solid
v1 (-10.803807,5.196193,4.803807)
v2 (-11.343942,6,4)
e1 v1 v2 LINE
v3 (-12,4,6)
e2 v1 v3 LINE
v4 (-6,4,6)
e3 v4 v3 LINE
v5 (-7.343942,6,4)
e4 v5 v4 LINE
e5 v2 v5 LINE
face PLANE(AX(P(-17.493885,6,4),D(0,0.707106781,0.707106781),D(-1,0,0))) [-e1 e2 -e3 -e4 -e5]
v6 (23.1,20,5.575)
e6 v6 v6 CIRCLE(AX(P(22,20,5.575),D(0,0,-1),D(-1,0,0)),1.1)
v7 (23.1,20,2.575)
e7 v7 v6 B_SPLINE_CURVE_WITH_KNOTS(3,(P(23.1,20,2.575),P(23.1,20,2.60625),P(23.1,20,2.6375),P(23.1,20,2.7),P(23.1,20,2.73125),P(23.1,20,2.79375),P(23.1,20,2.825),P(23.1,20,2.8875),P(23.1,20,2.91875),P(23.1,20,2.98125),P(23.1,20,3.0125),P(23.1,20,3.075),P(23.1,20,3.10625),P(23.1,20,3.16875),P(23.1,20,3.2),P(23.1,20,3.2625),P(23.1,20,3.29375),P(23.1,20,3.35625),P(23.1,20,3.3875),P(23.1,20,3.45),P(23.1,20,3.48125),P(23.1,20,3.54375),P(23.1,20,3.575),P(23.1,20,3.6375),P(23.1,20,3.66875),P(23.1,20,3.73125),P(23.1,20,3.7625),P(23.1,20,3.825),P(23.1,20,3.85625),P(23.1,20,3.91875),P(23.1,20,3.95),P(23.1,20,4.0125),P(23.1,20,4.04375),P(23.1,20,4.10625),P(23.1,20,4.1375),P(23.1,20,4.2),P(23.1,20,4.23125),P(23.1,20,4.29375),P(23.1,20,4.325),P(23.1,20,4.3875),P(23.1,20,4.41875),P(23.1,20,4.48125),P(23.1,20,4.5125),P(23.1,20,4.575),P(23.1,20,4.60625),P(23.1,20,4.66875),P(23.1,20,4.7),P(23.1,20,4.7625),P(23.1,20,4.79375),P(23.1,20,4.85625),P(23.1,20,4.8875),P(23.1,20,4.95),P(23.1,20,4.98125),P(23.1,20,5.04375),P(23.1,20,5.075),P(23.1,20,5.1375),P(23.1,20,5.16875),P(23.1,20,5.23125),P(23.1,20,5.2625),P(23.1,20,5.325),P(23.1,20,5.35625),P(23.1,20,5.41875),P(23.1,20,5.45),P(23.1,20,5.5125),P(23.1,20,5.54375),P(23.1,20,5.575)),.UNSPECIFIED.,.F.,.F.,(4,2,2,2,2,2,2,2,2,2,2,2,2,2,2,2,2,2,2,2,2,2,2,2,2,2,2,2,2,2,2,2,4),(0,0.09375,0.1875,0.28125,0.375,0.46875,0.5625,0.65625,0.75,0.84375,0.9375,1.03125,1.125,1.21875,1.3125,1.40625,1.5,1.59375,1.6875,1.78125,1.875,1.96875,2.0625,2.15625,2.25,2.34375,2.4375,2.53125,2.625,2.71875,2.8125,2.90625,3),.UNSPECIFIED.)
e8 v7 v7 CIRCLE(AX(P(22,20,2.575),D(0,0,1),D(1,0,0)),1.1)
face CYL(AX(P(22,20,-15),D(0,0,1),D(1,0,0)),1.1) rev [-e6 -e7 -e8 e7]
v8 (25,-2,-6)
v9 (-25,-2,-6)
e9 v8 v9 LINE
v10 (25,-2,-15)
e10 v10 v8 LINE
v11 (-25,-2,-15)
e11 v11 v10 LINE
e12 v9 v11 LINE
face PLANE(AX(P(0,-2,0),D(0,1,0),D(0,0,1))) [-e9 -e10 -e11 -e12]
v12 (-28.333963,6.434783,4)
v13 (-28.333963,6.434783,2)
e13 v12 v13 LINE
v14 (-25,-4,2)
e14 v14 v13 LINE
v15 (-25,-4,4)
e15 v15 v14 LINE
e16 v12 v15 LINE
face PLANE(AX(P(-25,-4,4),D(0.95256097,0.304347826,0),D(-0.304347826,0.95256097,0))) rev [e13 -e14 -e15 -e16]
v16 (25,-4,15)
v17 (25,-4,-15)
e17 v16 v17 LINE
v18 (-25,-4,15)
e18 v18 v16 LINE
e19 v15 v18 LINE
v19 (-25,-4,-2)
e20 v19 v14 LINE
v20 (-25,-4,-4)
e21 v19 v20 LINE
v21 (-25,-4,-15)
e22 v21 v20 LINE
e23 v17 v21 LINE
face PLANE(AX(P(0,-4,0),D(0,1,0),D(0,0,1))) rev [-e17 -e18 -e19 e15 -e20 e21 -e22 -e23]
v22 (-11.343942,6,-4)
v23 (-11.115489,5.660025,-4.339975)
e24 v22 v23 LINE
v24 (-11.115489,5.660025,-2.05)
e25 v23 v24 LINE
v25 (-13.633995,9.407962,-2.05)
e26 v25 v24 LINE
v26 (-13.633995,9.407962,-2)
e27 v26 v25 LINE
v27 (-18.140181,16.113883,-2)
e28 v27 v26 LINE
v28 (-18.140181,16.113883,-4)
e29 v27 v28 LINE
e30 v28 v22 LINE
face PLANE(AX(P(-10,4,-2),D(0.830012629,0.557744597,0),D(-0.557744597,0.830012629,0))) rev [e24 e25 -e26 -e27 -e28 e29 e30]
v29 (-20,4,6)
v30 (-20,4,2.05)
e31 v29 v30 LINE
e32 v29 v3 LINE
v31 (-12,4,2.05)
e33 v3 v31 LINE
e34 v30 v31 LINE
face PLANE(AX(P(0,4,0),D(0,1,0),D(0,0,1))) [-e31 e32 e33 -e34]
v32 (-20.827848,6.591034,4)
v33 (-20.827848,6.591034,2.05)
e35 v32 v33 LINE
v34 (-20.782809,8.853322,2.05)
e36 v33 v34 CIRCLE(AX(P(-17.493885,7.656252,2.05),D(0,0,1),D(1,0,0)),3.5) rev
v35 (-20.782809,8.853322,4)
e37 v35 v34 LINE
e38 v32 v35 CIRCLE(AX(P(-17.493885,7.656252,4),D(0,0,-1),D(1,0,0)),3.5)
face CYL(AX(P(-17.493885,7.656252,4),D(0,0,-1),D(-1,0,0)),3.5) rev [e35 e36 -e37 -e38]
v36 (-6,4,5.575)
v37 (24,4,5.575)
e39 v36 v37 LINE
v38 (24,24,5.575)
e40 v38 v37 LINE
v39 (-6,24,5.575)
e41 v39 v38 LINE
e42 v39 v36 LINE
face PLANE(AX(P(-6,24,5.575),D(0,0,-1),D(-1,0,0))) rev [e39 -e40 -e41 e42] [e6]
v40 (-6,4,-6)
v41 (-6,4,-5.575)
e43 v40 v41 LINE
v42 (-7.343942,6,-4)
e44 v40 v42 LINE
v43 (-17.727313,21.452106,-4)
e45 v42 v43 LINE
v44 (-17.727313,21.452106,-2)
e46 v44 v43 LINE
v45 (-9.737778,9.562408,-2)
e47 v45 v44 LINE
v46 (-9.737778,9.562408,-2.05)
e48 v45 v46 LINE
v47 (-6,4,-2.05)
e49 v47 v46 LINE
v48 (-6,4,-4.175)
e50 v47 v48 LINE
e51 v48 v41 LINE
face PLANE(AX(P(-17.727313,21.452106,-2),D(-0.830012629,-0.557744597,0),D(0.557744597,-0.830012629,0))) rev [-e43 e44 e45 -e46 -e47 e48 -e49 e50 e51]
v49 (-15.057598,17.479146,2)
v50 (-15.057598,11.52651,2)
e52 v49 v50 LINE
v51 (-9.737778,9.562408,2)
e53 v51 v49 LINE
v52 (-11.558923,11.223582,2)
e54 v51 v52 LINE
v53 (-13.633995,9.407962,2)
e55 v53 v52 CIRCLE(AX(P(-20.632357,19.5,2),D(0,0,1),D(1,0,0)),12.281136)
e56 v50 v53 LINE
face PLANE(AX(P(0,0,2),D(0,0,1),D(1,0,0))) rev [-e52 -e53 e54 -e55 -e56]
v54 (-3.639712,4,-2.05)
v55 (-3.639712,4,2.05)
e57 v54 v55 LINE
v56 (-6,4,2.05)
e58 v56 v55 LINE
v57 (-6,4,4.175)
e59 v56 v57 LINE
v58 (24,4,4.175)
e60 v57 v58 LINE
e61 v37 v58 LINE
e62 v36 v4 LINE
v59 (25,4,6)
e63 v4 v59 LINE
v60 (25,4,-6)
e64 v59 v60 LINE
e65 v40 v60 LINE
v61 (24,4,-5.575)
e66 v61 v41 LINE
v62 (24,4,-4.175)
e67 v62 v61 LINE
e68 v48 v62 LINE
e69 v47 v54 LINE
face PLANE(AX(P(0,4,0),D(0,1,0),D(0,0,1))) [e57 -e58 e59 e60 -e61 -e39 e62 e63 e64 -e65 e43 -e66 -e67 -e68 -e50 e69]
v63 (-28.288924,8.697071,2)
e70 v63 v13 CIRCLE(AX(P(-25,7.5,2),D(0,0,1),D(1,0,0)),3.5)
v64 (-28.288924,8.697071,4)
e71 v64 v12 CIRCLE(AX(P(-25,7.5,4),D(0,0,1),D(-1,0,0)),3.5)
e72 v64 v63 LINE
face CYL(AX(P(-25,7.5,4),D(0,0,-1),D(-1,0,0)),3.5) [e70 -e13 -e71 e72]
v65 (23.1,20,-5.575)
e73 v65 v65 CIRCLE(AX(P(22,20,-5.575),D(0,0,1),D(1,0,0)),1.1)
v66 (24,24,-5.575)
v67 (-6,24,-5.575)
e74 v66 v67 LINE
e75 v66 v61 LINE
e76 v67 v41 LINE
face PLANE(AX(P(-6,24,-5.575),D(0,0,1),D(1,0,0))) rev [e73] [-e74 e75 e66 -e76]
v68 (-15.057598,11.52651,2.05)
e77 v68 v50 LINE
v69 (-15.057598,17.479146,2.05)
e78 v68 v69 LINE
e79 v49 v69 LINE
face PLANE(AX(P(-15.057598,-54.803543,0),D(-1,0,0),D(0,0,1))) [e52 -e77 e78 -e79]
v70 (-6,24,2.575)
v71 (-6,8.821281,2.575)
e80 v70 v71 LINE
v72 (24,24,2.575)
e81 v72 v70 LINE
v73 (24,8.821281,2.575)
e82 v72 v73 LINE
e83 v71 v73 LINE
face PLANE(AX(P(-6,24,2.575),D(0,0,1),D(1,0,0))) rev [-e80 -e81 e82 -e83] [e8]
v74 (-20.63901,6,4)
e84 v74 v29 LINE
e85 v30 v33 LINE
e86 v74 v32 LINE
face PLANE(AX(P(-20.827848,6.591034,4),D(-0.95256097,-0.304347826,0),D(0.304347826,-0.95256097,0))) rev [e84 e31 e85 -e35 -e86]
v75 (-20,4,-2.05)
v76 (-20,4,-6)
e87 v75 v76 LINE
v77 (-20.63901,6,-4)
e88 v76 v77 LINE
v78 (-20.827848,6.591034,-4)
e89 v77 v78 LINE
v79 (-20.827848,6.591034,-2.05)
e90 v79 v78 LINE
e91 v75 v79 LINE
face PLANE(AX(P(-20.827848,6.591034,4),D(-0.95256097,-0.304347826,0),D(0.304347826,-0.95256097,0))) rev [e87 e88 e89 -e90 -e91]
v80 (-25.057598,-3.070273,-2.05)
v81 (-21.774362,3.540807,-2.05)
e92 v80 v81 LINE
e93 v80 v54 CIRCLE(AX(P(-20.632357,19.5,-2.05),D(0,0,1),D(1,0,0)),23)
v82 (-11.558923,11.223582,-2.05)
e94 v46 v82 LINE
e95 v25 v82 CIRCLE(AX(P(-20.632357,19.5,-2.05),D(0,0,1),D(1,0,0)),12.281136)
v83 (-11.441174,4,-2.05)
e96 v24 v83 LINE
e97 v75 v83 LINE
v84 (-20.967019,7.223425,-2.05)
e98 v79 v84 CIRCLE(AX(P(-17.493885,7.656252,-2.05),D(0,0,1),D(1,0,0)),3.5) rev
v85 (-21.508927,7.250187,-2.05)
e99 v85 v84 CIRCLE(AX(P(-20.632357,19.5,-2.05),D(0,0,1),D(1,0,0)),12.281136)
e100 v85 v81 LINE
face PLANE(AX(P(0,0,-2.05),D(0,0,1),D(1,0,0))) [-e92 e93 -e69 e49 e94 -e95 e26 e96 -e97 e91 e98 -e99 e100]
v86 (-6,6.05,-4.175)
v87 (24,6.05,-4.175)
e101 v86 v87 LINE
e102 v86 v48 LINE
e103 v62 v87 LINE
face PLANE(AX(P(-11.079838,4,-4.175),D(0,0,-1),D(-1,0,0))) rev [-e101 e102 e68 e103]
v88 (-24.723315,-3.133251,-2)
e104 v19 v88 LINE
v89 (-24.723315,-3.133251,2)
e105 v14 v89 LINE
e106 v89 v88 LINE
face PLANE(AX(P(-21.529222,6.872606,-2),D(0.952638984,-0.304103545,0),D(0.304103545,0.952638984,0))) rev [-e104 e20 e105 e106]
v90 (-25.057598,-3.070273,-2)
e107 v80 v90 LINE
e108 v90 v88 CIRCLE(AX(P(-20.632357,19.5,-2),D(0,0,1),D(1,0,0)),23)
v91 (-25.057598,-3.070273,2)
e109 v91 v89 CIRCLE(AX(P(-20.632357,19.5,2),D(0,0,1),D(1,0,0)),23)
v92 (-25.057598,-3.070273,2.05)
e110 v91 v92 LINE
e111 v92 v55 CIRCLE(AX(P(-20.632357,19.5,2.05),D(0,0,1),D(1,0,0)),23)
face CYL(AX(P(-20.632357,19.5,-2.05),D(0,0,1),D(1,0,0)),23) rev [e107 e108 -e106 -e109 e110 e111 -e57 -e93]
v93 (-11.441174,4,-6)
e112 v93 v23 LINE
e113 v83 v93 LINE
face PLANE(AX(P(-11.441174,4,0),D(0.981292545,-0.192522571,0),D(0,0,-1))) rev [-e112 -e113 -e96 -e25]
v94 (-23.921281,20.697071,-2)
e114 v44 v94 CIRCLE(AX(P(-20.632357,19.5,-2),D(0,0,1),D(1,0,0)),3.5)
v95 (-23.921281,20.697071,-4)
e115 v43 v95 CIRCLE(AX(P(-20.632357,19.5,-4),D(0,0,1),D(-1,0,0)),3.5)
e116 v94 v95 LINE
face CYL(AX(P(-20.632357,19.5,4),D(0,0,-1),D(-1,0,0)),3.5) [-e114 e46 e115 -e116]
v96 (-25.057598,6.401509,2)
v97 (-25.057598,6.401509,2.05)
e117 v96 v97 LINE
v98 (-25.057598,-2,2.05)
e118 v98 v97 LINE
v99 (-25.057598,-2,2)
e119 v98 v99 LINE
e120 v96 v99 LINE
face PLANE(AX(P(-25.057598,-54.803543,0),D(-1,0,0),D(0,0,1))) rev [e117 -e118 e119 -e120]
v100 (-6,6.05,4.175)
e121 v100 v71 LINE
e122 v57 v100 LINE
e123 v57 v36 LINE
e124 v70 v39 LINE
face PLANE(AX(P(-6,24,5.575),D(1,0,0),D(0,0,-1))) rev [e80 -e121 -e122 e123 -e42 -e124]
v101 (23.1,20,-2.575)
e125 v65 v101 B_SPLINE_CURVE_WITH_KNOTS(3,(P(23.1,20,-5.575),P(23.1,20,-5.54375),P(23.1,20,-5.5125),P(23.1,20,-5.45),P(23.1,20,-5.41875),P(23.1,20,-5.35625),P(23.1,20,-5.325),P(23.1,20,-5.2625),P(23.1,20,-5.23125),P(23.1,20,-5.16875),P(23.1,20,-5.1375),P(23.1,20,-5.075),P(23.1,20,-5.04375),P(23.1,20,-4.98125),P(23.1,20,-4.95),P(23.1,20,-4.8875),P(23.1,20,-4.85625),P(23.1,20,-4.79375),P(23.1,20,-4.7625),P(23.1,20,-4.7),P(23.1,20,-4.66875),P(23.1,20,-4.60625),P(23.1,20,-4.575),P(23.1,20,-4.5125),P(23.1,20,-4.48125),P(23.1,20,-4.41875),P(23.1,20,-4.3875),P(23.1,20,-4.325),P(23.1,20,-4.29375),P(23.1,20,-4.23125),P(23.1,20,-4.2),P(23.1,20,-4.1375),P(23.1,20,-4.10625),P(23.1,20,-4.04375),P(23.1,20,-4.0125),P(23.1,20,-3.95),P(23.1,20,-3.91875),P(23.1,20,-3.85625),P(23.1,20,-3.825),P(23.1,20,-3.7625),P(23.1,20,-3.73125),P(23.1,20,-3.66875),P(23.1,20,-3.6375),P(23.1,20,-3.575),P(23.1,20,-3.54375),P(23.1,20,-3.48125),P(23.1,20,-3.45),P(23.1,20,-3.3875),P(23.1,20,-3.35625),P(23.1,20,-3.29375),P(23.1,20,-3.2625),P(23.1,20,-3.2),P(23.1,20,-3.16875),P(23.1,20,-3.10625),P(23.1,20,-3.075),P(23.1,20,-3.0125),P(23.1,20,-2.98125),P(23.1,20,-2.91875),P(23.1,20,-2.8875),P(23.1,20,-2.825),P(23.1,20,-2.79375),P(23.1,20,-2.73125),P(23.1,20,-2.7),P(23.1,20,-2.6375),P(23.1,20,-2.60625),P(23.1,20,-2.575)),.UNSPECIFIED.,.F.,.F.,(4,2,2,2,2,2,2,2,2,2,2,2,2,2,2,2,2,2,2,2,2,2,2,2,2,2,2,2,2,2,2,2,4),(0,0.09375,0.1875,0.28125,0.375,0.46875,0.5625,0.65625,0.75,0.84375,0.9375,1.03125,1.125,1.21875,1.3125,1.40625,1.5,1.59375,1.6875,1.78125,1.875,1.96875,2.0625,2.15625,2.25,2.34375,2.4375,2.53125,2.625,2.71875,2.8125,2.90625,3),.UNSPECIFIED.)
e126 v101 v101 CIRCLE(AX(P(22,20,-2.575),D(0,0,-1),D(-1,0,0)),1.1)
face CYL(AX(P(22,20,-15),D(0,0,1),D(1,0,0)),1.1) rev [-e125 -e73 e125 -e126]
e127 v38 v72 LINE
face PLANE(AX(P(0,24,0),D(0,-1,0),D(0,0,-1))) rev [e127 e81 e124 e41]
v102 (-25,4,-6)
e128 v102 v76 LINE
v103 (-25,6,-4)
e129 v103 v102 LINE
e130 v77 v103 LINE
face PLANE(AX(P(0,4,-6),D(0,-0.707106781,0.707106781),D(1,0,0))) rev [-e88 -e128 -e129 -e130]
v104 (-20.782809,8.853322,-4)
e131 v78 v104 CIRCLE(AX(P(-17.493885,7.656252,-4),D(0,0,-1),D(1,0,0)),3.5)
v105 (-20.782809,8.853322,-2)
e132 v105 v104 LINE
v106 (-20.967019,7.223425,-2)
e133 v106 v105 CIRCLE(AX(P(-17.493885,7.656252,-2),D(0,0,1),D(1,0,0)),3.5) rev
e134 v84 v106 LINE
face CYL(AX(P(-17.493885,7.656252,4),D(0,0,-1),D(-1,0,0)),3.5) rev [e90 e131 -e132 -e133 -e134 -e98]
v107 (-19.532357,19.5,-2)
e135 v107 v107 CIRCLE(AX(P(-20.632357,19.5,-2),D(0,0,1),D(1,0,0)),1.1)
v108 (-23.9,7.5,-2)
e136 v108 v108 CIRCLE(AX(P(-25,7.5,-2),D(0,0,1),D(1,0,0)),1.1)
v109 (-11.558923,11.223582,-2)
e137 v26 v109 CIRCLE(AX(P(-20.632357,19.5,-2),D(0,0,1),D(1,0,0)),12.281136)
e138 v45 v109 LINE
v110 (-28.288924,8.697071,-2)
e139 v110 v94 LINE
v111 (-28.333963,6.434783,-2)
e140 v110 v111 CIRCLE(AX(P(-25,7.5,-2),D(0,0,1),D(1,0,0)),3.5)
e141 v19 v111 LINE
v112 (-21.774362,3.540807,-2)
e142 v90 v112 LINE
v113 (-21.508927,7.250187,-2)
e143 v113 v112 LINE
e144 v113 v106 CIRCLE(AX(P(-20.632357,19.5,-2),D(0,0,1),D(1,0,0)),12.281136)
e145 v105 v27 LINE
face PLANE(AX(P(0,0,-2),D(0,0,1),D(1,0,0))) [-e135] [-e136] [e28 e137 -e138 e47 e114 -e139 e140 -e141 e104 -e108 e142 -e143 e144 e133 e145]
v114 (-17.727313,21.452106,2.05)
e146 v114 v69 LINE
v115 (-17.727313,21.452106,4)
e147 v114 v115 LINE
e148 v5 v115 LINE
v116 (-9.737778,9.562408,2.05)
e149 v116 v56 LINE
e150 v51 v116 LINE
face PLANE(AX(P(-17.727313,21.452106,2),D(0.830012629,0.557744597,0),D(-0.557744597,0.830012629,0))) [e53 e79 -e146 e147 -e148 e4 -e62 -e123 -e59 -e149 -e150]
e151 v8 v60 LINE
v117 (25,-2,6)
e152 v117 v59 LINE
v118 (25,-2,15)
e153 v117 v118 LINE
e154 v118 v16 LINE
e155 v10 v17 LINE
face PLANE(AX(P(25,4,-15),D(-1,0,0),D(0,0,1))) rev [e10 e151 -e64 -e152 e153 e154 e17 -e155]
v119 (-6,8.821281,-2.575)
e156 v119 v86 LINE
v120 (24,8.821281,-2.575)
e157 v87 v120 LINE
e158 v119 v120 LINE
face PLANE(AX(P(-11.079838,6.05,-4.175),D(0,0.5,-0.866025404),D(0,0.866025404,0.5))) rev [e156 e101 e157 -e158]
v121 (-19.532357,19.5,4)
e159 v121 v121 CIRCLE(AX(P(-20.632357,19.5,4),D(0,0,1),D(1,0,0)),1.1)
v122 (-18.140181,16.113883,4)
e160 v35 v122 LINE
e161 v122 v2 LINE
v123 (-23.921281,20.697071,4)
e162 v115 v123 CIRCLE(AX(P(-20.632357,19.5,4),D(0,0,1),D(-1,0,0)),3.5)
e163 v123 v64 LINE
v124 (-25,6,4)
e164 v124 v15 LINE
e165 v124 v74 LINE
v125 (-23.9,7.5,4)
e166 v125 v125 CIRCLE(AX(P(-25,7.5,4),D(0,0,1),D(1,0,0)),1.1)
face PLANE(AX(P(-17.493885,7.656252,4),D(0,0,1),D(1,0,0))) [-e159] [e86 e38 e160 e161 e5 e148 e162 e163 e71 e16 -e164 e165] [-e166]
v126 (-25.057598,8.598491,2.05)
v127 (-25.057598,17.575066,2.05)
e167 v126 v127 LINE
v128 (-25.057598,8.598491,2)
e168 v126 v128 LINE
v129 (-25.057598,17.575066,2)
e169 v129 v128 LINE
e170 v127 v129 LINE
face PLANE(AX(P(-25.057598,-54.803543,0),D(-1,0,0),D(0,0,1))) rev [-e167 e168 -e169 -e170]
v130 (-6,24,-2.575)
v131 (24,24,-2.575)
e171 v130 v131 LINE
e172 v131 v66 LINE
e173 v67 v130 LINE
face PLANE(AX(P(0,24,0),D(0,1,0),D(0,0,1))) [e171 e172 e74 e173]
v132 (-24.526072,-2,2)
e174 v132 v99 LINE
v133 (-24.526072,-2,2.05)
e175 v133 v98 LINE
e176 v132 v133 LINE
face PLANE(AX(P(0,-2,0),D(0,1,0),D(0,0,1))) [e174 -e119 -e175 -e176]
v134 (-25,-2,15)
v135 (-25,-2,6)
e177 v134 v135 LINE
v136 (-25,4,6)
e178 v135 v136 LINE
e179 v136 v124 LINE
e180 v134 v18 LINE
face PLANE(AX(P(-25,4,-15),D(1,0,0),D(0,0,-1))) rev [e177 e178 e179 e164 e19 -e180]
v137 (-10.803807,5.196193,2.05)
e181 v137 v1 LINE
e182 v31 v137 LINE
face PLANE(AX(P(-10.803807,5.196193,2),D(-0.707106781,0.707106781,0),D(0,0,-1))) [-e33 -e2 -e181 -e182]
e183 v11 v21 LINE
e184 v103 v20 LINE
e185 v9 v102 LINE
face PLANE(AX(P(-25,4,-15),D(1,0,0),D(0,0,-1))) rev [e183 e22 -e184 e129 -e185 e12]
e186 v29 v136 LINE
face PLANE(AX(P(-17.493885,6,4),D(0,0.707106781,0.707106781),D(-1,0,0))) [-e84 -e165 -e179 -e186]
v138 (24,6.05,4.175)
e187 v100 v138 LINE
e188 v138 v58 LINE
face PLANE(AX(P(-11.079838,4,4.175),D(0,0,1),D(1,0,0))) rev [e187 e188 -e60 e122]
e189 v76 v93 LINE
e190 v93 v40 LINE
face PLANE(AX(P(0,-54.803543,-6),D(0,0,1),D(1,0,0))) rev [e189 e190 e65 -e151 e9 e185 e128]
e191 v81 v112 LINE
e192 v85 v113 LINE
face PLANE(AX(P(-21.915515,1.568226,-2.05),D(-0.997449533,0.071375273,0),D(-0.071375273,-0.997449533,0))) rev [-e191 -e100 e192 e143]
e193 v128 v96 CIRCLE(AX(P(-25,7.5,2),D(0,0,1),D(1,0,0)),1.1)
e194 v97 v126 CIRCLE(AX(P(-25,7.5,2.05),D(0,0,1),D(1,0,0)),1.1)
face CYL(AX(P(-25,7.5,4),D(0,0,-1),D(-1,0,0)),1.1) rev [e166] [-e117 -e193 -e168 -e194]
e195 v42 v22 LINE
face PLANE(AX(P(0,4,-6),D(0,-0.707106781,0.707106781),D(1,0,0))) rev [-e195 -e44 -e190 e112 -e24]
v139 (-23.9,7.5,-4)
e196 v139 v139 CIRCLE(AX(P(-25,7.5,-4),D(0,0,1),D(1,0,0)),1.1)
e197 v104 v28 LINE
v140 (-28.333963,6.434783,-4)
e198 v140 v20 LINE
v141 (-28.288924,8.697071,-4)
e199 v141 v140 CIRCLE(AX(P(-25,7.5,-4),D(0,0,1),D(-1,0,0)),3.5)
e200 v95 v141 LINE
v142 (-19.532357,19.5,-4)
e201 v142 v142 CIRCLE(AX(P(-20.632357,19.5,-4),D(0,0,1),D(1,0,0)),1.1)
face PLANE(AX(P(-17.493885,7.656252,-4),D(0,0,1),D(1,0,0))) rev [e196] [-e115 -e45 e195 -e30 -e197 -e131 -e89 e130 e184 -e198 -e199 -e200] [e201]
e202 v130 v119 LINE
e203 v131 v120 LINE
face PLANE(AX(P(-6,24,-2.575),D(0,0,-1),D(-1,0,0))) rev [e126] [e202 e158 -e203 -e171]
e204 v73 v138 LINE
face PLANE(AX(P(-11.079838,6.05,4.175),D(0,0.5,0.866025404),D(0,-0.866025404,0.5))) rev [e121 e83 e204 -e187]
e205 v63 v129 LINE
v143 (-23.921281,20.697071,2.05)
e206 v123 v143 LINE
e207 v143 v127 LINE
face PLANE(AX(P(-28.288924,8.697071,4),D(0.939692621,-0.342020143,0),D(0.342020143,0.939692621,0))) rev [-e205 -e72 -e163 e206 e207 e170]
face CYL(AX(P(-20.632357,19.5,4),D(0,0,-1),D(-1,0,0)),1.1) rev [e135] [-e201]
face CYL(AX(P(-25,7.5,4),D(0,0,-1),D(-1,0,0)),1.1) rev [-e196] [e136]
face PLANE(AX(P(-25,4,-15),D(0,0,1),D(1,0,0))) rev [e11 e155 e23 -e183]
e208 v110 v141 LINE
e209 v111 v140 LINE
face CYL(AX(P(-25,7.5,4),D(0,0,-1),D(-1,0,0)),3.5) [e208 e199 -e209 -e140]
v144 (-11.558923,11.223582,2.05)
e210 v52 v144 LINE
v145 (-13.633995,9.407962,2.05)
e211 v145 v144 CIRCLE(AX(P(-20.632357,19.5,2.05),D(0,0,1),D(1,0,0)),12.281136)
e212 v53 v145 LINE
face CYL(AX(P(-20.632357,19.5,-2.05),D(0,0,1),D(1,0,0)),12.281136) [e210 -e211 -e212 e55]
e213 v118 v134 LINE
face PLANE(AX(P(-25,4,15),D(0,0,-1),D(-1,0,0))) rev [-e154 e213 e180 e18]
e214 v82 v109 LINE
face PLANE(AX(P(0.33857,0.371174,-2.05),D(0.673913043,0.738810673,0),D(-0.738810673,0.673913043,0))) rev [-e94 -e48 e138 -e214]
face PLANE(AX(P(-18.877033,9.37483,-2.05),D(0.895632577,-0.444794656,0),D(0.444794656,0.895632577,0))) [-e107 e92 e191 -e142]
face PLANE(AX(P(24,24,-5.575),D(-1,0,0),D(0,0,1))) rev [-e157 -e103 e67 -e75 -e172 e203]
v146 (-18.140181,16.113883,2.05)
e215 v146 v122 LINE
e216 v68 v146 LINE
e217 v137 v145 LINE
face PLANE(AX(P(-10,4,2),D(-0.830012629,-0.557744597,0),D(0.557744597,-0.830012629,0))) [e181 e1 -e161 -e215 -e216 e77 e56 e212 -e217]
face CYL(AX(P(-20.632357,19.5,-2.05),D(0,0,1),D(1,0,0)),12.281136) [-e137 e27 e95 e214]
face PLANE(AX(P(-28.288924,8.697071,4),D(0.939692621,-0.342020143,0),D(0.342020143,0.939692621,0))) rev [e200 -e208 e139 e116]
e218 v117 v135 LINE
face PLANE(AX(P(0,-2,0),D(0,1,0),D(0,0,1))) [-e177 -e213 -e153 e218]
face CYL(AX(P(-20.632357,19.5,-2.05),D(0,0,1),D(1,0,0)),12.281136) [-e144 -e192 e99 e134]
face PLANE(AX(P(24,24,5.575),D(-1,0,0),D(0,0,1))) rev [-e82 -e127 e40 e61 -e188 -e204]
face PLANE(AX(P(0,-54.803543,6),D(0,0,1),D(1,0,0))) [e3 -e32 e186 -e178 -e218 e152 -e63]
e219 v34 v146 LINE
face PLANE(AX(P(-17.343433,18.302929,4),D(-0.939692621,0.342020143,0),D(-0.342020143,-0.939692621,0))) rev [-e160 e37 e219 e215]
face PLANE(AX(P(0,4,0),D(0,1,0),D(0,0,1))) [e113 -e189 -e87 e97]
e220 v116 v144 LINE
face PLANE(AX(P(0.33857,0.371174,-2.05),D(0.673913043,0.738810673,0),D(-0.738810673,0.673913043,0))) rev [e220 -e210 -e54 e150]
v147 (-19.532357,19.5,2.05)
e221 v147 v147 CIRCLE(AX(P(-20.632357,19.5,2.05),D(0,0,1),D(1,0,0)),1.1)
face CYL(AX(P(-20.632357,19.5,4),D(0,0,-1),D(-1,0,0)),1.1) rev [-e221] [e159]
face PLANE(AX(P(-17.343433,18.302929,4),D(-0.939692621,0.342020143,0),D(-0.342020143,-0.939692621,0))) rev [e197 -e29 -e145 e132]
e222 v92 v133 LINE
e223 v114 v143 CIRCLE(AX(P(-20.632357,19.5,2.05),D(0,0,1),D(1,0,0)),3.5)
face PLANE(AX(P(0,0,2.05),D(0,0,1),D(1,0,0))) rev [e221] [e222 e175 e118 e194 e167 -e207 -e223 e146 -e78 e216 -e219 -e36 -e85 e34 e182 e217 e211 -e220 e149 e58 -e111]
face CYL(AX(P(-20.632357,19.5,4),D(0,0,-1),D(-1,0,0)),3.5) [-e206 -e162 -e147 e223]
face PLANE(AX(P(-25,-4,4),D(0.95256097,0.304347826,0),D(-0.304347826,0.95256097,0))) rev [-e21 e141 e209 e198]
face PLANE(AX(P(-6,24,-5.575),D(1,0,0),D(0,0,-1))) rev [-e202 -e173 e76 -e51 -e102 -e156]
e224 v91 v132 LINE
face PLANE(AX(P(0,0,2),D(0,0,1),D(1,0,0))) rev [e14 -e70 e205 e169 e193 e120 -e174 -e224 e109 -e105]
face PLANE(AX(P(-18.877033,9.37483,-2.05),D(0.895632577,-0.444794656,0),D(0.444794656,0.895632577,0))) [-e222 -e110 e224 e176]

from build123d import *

# Parameters (mm, degrees)
SKETCH_1_W               = 50
SKETCH_1_H               = 30
EXTRUDE_1_DEPTH          = 4
SKETCH_2_R               = 1.1
EXTRUDE_2_DEPTH          = 4
CUT_EXTRUDE_1_DEPTH      = 2
EXTRUDE_3_DEPTH          = 2
CUT_EXTRUDE_3_DEPTH      = 2.05
SKETCH_7_W               = 30
SKETCH_7_H               = 3
EXTRUDE_4_DEPTH          = 20
FILLET_3_R               = 2
CUT_EXTRUDE_5_DEPTH      = 38.911080175
CUT_EXTRUDE_5_DEPTH_BACK = 6
SKETCH_9_W               = 10
SKETCH_9_H               = 2
CUT_EXTRUDE_6_DEPTH      = 30
CUT_EXTRUDE_7_DEPTH      = 41.165283517
CUT_EXTRUDE_7_DEPTH_BACK = 41.165283517
SKETCH_11_R              = 1.1


with BuildPart() as part:
    # 草图1 → 凸台-拉伸1 (new, symmetric)
    with BuildSketch(Plane(origin=(0, 0, 0), x_dir=(1, 0, 0), z_dir=(0, 1, 0))):
        Rectangle(SKETCH_1_W, SKETCH_1_H)
    extrude(amount=EXTRUDE_1_DEPTH, both=True)

    # 草图2 → 凸台-拉伸2 (add, symmetric)
    with BuildSketch(Plane.XY):
        with BuildLine():
            Line((-25, -4), (-28.333963394, 6.434782609))
            ThreePointArc((-28.333963394, 6.434782609), (-28.499306582, 7.56966666), (-28.288924173, 8.697070502))
            Line((-28.288924173, 8.697070502), (-23.921281362, 20.697070502))
            ThreePointArc((-23.921281362, 20.697070502), (-19.435286687, 22.788924173), (-17.343433016, 18.302929498))
            Line((-17.343433016, 18.302929498), (-20.782808769, 8.853322281))
            ThreePointArc((-20.782808769, 8.853322281), (-20.993191178, 7.72591844), (-20.827847989, 6.591034388))
            Line((-20.827847989, 6.591034388), (-20, 4))
            Line((-20, 4), (-25, -4))
        make_face()
        with Locations((-25, 7.5)):
            Circle(SKETCH_2_R, mode=Mode.SUBTRACT)
        with Locations((-20.632357189, 19.5)):
            Circle(SKETCH_2_R, mode=Mode.SUBTRACT)
    extrude(amount=EXTRUDE_2_DEPTH, both=True)

    # 草图3 → 切除-拉伸1 (cut, symmetric)
    with BuildSketch(Plane.XY):
        with BuildLine():
            ThreePointArc((-28.288924173, 8.697070502), (-28.499306582, 7.56966666), (-28.333963394, 6.434782609))
            Line((-28.333963394, 6.434782609), (-25, -4))
            Line((-25, -4), (-21.711075827, 6.302929498))
            Line((-21.711075827, 6.302929498), (-20.537616571, 5.928335213))
            Line((-20.537616571, 5.928335213), (-20.782808769, 8.853322281))
            Line((-20.782808769, 8.853322281), (-17.343433016, 18.302929498))
            ThreePointArc((-17.343433016, 18.302929498), (-19.435286687, 22.788924173), (-23.921281362, 20.697070502))
            Line((-23.921281362, 20.697070502), (-28.288924173, 8.697070502))
        make_face()
    extrude(amount=CUT_EXTRUDE_1_DEPTH, both=True, mode=Mode.SUBTRACT)

    # 草图4 → 凸台-拉伸3 (add)
    with BuildSketch(Plane.XY.offset(4)):
        Polygon((-17.727312988, 21.45210609), (-6, 4), (-10, 4), (-18.140180759, 16.113883065), align=None)
    extrude_3 = extrude(amount=-EXTRUDE_3_DEPTH)

    # 镜向1: 凸台-拉伸3 across plane
    add(extrude_3.mirror(Plane.XY))

    # 草图6 → 切除-拉伸3 (cut, symmetric)
    with BuildSketch(Plane.XY):
        with BuildLine():
            Line((-21.508926635, 7.250186543), (-22.273988478, -3.441339253))
            ThreePointArc((-22.273988478, -3.441339253), (-12.102598016, -1.859850385), (-3.639711721, 4))
            Line((-3.639711721, 4), (-11.558922773, 11.223582198))
            ThreePointArc((-11.558922773, 11.223582198), (-16.077786178, 8.094642196), (-21.508926635, 7.250186543))
        make_face()
        with BuildLine():
            Line((-22.273988478, -3.441339253), (-21.774361564, 3.540807476))
            Line((-21.774361564, 3.540807476), (-25.057597959, -3.070273462))
            ThreePointArc((-25.057597959, -3.070273462), (-23.671461761, -3.298329838), (-22.273988478, -3.441339253))
        make_face()
    extrude(amount=CUT_EXTRUDE_3_DEPTH, both=True, mode=Mode.SUBTRACT)

    # 草图7 → 凸台-拉伸4 (add)
    with BuildSketch(Plane(origin=(0, 4, 0), x_dir=(1, 0, 0), z_dir=(0, 1, 0))):
        with Locations((9, -4.075)):
            Rectangle(SKETCH_7_W, SKETCH_7_H)
        with Locations((9, 4.075)):
            Rectangle(SKETCH_7_W, SKETCH_7_H)
    extrude(amount=EXTRUDE_4_DEPTH)

    # 圆角3
    # the kernel refuses this fillet: 2 mm, written as the material it takes off along each edge
    with BuildSketch(Plane(origin=(-21.579710991, 6.260994922, 2), x_dir=(-0.07137527342969462, -0.9974495327297699, 0), z_dir=(0, 0, -1))) as fillet_3_piece_1:
        with BuildLine():
            CenterArc((0.687360644, 2), FILLET_3_R, 248.905574678, 21.094425322)
            Line((-0.032451423, 0.134022886), (-0.046847664, 0.096703344))
            ThreePointArc((-0.046847664, 0.096703344), (-0.055102303, 0.05759812), (-0.038876591, -0.009413323))
            Line((-0.038876591, -0.009413323), (0, -0.04))
            Line((0, -0.04), (0.687360644, -0.04))
            Line((0.687360644, -0.04), (0.687360644, 0))
        make_face()
    extrude(amount=4, mode=Mode.SUBTRACT)

    # 倒角2
    # the kernel refuses this chamfer: 2, 1.441174265 mm, written as the material it adds along each edge
    with BuildSketch(Plane(origin=(-6, 4, -4), x_dir=(0, -0.02749587661058627, -0.9996219169112968), z_dir=(-1, 0, 0))) as chamfer_2_piece_1_section:
        with BuildLine():
            Line((2.05734639, 0), (-0.11309431, -2.054235587))
            Line((-0.11309431, -2.054235587), (-0.153079186, -2.053135752))
            ThreePointArc((-0.153079186, -2.053135752), (-0.068258454, -1.026795659), (-0.039984877, 0.001099835))
            Line((-0.039984877, 0.001099835), (0.001099835, 0.039984877))
            ThreePointArc((0.001099835, 0.039984877), (1.028995329, 0.011711299), (2.058446225, 0.039984877))
            Line((2.058446225, 0.039984877), (2.05734639, 0))
        make_face()
    chamfer_2_piece_1 = extrude(amount=9.143365976, mode=Mode.PRIVATE)
    chamfer_2_piece_1 = split(chamfer_2_piece_1, bisect_by=Plane(origin=(-7.065617909, 5.585808856, -4.659423843), z_dir=(-0.8300126289410857, -0.5577445972829389, 0)), keep=Keep.TOP, mode=Mode.PRIVATE)
    chamfer_2_piece_1 = split(chamfer_2_piece_1, bisect_by=Plane(origin=(-9.821301765, 3.734068618, -4.659423843), z_dir=(0.8300126289410859, 0.5577445972829388, 0)), keep=Keep.TOP, mode=Mode.PRIVATE)
    add(chamfer_2_piece_1)
    with BuildSketch(Plane(origin=(-25, 4, 4), x_dir=(0, -0.02749587661058627, 0.9996219169112968), z_dir=(1, 0, 0))) as chamfer_2_piece_2_section:
        with BuildLine():
            Line((2.05734639, 0), (-0.11309431, -2.054235587))
            Line((-0.11309431, -2.054235587), (-0.153079186, -2.053135752))
            ThreePointArc((-0.153079186, -2.053135752), (-0.068258454, -1.026795659), (-0.039984877, 0.001099835))
            Line((-0.039984877, 0.001099835), (0.001099835, 0.039984877))
            ThreePointArc((0.001099835, 0.039984877), (1.028995329, 0.011711299), (2.058446225, 0.039984877))
            Line((2.058446225, 0.039984877), (2.05734639, 0))
        make_face()
    chamfer_2_piece_2 = extrude(amount=10.143365976, mode=Mode.PRIVATE)
    chamfer_2_piece_2 = split(chamfer_2_piece_2, bisect_by=Plane(origin=(-20.42738659, 5.337653005, 4.668646513), z_dir=(-0.9525609695742022, -0.30434782608695565, 0)), keep=Keep.TOP, mode=Mode.PRIVATE)
    add(chamfer_2_piece_2)
    with BuildSketch(Plane(origin=(-25, 4, -4), x_dir=(0, -0.02749587661058627, -0.9996219169112968), z_dir=(1, 0, 0))) as chamfer_2_piece_3_section:
        with BuildLine():
            Line((2.05734639, 0), (-0.11309431, 2.054235587))
            Line((-0.11309431, 2.054235587), (-0.153079186, 2.053135752))
            ThreePointArc((-0.153079186, 2.053135752), (-0.068258454, 1.026795659), (-0.039984877, -0.001099835))
            Line((-0.039984877, -0.001099835), (0.001099835, -0.039984877))
            ThreePointArc((0.001099835, -0.039984877), (1.028995329, -0.011711299), (2.058446225, -0.039984877))
            Line((2.058446225, -0.039984877), (2.05734639, 0))
        make_face()
    chamfer_2_piece_3 = extrude(amount=10.143365976, mode=Mode.PRIVATE)
    chamfer_2_piece_3 = split(chamfer_2_piece_3, bisect_by=Plane(origin=(-20.42738659, 5.337653005, -4.668646513), z_dir=(-0.9525609695742022, -0.30434782608695565, 0)), keep=Keep.TOP, mode=Mode.PRIVATE)
    add(chamfer_2_piece_3)
    with BuildSketch(Plane(origin=(-6, 4, 4), x_dir=(0, -0.02749587661058627, 0.9996219169112968), z_dir=(-1, 0, 0))) as chamfer_2_piece_4_section:
        with BuildLine():
            Line((2.05734639, 0), (-0.11309431, 2.054235587))
            Line((-0.11309431, 2.054235587), (-0.153079186, 2.053135752))
            ThreePointArc((-0.153079186, 2.053135752), (-0.068258454, 1.026795659), (-0.039984877, -0.001099835))
            Line((-0.039984877, -0.001099835), (0.001099835, -0.039984877))
            ThreePointArc((0.001099835, -0.039984877), (1.028995329, -0.011711299), (2.058446225, -0.039984877))
            Line((2.058446225, -0.039984877), (2.05734639, 0))
        make_face()
    chamfer_2_piece_4 = extrude(amount=9.143365976, mode=Mode.PRIVATE)
    chamfer_2_piece_4 = split(chamfer_2_piece_4, bisect_by=Plane(origin=(-9.821301765, 3.734068618, 4.659423843), z_dir=(0.8300126289410859, 0.5577445972829388, 0)), keep=Keep.TOP, mode=Mode.PRIVATE)
    chamfer_2_piece_4 = split(chamfer_2_piece_4, bisect_by=Plane(origin=(-7.065617909, 5.585808856, 4.659423843), z_dir=(-0.8300126289410857, -0.5577445972829389, 0)), keep=Keep.TOP, mode=Mode.PRIVATE)
    add(chamfer_2_piece_4)
    with BuildSketch(Plane(origin=(-10, 4, -4), x_dir=(-0.9985507752193709, -0.0538177415802029, 0), z_dir=(0, 0, 1))) as chamfer_2_piece_5:
        with BuildLine():
            Line((1.45869004, 0), (1.004929429, -1.795213361))
            Line((1.004929429, -1.795213361), (0.970576376, -1.815704037))
            ThreePointArc((0.970576376, -1.815704037), (0.492402938, -0.903608261), (-0.034353052, -0.020490676))
            Line((-0.034353052, -0.020490676), (0.00215271, 0.039942031))
            ThreePointArc((0.00215271, 0.039942031), (0.729385292, 0.000747214), (1.46084275, 0.039942031))
            Line((1.46084275, 0.039942031), (1.45869004, 0))
        make_face()
    extrude(amount=1.95)
    with BuildSketch(Plane(origin=(-10, 4, 4), x_dir=(-0.9996219169112968, -0.027495876610585623, 0), z_dir=(0, 0, -1))) as chamfer_2_piece_6:
        with BuildLine():
            Line((2.05734639, 0), (0.712510327, 1.272833716))
            Line((0.712510327, 1.272833716), (0.678708947, 1.294222188))
            ThreePointArc((0.678708947, 1.294222188), (0.355622826, 0.636816982), (-0.03380138, 0.021388472))
            Line((-0.03380138, 0.021388472), (0.001099835, -0.039984877))
            ThreePointArc((0.001099835, -0.039984877), (1.028995329, -0.011711299), (2.058446225, -0.039984877))
            Line((2.058446225, -0.039984877), (2.05734639, 0))
        make_face()
    extrude(amount=1.95)
    with BuildSketch(Plane(origin=(-10, 4, -9.143365976), x_dir=(-0.9985507752193707, -0.053817741580204116, 0), z_dir=(0, 0, 1))) as chamfer_2_piece_7a_section:
        with BuildLine():
            Line((1.45869004, 0), (1.004929429, -1.795213361))
            Line((1.004929429, -1.795213361), (0.970576376, -1.815704037))
            ThreePointArc((0.970576376, -1.815704037), (0.492402938, -0.903608261), (-0.034353052, -0.020490676))
            Line((-0.034353052, -0.020490676), (0.00215271, 0.039942031))
            ThreePointArc((0.00215271, 0.039942031), (0.729385292, 0.000747214), (1.46084275, 0.039942031))
            Line((1.46084275, 0.039942031), (1.45869004, 0))
        make_face()
    chamfer_2_piece_7a = extrude(amount=7.093365976, mode=Mode.PRIVATE)
    chamfer_2_piece_7a = split(chamfer_2_piece_7a, bisect_by=Plane(origin=(-10.840073323, 4.554425115, -4), z_dir=(0, 0, -1)), keep=Keep.TOP, mode=Mode.PRIVATE)
    with BuildSketch(Plane(origin=(-6, 4, -4), x_dir=(0, -0.02749587661058627, -0.9996219169112968), z_dir=(-1, 0, 0))) as chamfer_2_piece_7b_section:
        with BuildLine():
            Line((2.05734639, 0), (-0.11309431, -2.054235587))
            Line((-0.11309431, -2.054235587), (-0.153079186, -2.053135752))
            ThreePointArc((-0.153079186, -2.053135752), (-0.068258454, -1.026795659), (-0.039984877, 0.001099835))
            Line((-0.039984877, 0.001099835), (0.001099835, 0.039984877))
            ThreePointArc((0.001099835, 0.039984877), (1.028995329, 0.011711299), (2.058446225, 0.039984877))
            Line((2.058446225, 0.039984877), (2.05734639, 0))
        make_face()
    chamfer_2_piece_7b = extrude(amount=9.143365976, mode=Mode.PRIVATE)
    chamfer_2_piece_7b = split(chamfer_2_piece_7b, bisect_by=Plane(origin=(-11.153674237, 5.716850671, -4.67900162), z_dir=(-0.8300126289410859, -0.5577445972829388, 0)), keep=Keep.TOP, mode=Mode.PRIVATE)
    chamfer_2_piece_7 = chamfer_2_piece_7a & chamfer_2_piece_7b
    add(chamfer_2_piece_7)
    with BuildSketch(Plane(origin=(-6, 4, 4), x_dir=(0, -0.02749587661058627, 0.9996219169112968), z_dir=(-1, 0, 0))) as chamfer_2_piece_8a_section:
        with BuildLine():
            Line((2.05734639, 0), (-0.11309431, 2.054235587))
            Line((-0.11309431, 2.054235587), (-0.153079186, 2.053135752))
            ThreePointArc((-0.153079186, 2.053135752), (-0.068258454, 1.026795659), (-0.039984877, -0.001099835))
            Line((-0.039984877, -0.001099835), (0.001099835, -0.039984877))
            ThreePointArc((0.001099835, -0.039984877), (1.028995329, -0.011711299), (2.058446225, -0.039984877))
            Line((2.058446225, -0.039984877), (2.05734639, 0))
        make_face()
    chamfer_2_piece_8a = extrude(amount=9.143365976, mode=Mode.PRIVATE)
    chamfer_2_piece_8a = split(chamfer_2_piece_8a, bisect_by=Plane(origin=(-11.153674237, 5.716850671, 4.67900162), z_dir=(-0.8300126289410859, -0.5577445972829388, 0)), keep=Keep.TOP, mode=Mode.PRIVATE)
    with BuildSketch(Plane(origin=(-10, 4, 9.143365976), x_dir=(-0.9996219169112968, -0.027495876610586487, 0), z_dir=(0, 0, -1))) as chamfer_2_piece_8b_section:
        with BuildLine():
            Line((2.05734639, 0), (0.712510327, 1.272833716))
            Line((0.712510327, 1.272833716), (0.678708947, 1.294222188))
            ThreePointArc((0.678708947, 1.294222188), (0.355622826, 0.636816982), (-0.03380138, 0.021388472))
            Line((-0.03380138, 0.021388472), (0.001099835, -0.039984877))
            ThreePointArc((0.001099835, -0.039984877), (1.028995329, -0.011711299), (2.058446225, -0.039984877))
            Line((2.058446225, -0.039984877), (2.05734639, 0))
        make_face()
    chamfer_2_piece_8b = extrude(amount=7.093365976, mode=Mode.PRIVATE)
    chamfer_2_piece_8b = split(chamfer_2_piece_8b, bisect_by=Plane(origin=(-10.928726204, 4.388043855, 4), z_dir=(0, 0, 1)), keep=Keep.TOP, mode=Mode.PRIVATE)
    chamfer_2_piece_8 = chamfer_2_piece_8a & chamfer_2_piece_8b
    add(chamfer_2_piece_8)

    # 草图9 → 切除-拉伸5 (cut, two sides: drawn at the far end of the back side and taken through both)
    with BuildSketch(Plane(origin=(0, 4, 0), x_dir=(1, 0, 0), z_dir=(0, 1, 0)).offset(-CUT_EXTRUDE_5_DEPTH_BACK)):
        Polygon((-15.057597959, -2.05), (-15.057597959, 0), (-25.057597959, 0), (-25.057597959, -2.05), (-20, -2.05), align=None)
        with Locations((-20.057597959, 1)):
            Rectangle(SKETCH_9_W, SKETCH_9_H)
        Polygon((25, 15), (-25, 15), (-25, 6), (-20, 6), (-11.441174265, 6), (-6, 6), (25, 6), align=None)
        Polygon((25, -15), (25, -6), (-6, -6), (-12, -6), (-20, -6), (-25, -6), (-25, -15), align=None)
    extrude(amount=CUT_EXTRUDE_5_DEPTH + CUT_EXTRUDE_5_DEPTH_BACK, mode=Mode.SUBTRACT)

    # 草图10 → 切除-拉伸6 (cut)
    with BuildSketch(Plane(origin=(24, 0, 0), x_dir=(0, 0, -1), z_dir=(1, 0, 0))):
        Polygon((-2.575, 4), (-4.175, 4), (-4.175, 6.05), (-2.575, 8.821281292), align=None)
        Polygon((4.175, 6.05), (2.575, 8.821281292), (2.575, 4), (4.175, 4), align=None)
    extrude(amount=-CUT_EXTRUDE_6_DEPTH, mode=Mode.SUBTRACT)

    # 草图11 → 切除-拉伸7 (cut, two sides: drawn at the far end of the back side and taken through both)
    with BuildSketch(Plane.XY.offset(-CUT_EXTRUDE_7_DEPTH_BACK)):
        with Locations((22, 20)):
            Circle(SKETCH_11_R)
    extrude(amount=CUT_EXTRUDE_7_DEPTH + CUT_EXTRUDE_7_DEPTH_BACK, mode=Mode.SUBTRACT)


solid = part.part
